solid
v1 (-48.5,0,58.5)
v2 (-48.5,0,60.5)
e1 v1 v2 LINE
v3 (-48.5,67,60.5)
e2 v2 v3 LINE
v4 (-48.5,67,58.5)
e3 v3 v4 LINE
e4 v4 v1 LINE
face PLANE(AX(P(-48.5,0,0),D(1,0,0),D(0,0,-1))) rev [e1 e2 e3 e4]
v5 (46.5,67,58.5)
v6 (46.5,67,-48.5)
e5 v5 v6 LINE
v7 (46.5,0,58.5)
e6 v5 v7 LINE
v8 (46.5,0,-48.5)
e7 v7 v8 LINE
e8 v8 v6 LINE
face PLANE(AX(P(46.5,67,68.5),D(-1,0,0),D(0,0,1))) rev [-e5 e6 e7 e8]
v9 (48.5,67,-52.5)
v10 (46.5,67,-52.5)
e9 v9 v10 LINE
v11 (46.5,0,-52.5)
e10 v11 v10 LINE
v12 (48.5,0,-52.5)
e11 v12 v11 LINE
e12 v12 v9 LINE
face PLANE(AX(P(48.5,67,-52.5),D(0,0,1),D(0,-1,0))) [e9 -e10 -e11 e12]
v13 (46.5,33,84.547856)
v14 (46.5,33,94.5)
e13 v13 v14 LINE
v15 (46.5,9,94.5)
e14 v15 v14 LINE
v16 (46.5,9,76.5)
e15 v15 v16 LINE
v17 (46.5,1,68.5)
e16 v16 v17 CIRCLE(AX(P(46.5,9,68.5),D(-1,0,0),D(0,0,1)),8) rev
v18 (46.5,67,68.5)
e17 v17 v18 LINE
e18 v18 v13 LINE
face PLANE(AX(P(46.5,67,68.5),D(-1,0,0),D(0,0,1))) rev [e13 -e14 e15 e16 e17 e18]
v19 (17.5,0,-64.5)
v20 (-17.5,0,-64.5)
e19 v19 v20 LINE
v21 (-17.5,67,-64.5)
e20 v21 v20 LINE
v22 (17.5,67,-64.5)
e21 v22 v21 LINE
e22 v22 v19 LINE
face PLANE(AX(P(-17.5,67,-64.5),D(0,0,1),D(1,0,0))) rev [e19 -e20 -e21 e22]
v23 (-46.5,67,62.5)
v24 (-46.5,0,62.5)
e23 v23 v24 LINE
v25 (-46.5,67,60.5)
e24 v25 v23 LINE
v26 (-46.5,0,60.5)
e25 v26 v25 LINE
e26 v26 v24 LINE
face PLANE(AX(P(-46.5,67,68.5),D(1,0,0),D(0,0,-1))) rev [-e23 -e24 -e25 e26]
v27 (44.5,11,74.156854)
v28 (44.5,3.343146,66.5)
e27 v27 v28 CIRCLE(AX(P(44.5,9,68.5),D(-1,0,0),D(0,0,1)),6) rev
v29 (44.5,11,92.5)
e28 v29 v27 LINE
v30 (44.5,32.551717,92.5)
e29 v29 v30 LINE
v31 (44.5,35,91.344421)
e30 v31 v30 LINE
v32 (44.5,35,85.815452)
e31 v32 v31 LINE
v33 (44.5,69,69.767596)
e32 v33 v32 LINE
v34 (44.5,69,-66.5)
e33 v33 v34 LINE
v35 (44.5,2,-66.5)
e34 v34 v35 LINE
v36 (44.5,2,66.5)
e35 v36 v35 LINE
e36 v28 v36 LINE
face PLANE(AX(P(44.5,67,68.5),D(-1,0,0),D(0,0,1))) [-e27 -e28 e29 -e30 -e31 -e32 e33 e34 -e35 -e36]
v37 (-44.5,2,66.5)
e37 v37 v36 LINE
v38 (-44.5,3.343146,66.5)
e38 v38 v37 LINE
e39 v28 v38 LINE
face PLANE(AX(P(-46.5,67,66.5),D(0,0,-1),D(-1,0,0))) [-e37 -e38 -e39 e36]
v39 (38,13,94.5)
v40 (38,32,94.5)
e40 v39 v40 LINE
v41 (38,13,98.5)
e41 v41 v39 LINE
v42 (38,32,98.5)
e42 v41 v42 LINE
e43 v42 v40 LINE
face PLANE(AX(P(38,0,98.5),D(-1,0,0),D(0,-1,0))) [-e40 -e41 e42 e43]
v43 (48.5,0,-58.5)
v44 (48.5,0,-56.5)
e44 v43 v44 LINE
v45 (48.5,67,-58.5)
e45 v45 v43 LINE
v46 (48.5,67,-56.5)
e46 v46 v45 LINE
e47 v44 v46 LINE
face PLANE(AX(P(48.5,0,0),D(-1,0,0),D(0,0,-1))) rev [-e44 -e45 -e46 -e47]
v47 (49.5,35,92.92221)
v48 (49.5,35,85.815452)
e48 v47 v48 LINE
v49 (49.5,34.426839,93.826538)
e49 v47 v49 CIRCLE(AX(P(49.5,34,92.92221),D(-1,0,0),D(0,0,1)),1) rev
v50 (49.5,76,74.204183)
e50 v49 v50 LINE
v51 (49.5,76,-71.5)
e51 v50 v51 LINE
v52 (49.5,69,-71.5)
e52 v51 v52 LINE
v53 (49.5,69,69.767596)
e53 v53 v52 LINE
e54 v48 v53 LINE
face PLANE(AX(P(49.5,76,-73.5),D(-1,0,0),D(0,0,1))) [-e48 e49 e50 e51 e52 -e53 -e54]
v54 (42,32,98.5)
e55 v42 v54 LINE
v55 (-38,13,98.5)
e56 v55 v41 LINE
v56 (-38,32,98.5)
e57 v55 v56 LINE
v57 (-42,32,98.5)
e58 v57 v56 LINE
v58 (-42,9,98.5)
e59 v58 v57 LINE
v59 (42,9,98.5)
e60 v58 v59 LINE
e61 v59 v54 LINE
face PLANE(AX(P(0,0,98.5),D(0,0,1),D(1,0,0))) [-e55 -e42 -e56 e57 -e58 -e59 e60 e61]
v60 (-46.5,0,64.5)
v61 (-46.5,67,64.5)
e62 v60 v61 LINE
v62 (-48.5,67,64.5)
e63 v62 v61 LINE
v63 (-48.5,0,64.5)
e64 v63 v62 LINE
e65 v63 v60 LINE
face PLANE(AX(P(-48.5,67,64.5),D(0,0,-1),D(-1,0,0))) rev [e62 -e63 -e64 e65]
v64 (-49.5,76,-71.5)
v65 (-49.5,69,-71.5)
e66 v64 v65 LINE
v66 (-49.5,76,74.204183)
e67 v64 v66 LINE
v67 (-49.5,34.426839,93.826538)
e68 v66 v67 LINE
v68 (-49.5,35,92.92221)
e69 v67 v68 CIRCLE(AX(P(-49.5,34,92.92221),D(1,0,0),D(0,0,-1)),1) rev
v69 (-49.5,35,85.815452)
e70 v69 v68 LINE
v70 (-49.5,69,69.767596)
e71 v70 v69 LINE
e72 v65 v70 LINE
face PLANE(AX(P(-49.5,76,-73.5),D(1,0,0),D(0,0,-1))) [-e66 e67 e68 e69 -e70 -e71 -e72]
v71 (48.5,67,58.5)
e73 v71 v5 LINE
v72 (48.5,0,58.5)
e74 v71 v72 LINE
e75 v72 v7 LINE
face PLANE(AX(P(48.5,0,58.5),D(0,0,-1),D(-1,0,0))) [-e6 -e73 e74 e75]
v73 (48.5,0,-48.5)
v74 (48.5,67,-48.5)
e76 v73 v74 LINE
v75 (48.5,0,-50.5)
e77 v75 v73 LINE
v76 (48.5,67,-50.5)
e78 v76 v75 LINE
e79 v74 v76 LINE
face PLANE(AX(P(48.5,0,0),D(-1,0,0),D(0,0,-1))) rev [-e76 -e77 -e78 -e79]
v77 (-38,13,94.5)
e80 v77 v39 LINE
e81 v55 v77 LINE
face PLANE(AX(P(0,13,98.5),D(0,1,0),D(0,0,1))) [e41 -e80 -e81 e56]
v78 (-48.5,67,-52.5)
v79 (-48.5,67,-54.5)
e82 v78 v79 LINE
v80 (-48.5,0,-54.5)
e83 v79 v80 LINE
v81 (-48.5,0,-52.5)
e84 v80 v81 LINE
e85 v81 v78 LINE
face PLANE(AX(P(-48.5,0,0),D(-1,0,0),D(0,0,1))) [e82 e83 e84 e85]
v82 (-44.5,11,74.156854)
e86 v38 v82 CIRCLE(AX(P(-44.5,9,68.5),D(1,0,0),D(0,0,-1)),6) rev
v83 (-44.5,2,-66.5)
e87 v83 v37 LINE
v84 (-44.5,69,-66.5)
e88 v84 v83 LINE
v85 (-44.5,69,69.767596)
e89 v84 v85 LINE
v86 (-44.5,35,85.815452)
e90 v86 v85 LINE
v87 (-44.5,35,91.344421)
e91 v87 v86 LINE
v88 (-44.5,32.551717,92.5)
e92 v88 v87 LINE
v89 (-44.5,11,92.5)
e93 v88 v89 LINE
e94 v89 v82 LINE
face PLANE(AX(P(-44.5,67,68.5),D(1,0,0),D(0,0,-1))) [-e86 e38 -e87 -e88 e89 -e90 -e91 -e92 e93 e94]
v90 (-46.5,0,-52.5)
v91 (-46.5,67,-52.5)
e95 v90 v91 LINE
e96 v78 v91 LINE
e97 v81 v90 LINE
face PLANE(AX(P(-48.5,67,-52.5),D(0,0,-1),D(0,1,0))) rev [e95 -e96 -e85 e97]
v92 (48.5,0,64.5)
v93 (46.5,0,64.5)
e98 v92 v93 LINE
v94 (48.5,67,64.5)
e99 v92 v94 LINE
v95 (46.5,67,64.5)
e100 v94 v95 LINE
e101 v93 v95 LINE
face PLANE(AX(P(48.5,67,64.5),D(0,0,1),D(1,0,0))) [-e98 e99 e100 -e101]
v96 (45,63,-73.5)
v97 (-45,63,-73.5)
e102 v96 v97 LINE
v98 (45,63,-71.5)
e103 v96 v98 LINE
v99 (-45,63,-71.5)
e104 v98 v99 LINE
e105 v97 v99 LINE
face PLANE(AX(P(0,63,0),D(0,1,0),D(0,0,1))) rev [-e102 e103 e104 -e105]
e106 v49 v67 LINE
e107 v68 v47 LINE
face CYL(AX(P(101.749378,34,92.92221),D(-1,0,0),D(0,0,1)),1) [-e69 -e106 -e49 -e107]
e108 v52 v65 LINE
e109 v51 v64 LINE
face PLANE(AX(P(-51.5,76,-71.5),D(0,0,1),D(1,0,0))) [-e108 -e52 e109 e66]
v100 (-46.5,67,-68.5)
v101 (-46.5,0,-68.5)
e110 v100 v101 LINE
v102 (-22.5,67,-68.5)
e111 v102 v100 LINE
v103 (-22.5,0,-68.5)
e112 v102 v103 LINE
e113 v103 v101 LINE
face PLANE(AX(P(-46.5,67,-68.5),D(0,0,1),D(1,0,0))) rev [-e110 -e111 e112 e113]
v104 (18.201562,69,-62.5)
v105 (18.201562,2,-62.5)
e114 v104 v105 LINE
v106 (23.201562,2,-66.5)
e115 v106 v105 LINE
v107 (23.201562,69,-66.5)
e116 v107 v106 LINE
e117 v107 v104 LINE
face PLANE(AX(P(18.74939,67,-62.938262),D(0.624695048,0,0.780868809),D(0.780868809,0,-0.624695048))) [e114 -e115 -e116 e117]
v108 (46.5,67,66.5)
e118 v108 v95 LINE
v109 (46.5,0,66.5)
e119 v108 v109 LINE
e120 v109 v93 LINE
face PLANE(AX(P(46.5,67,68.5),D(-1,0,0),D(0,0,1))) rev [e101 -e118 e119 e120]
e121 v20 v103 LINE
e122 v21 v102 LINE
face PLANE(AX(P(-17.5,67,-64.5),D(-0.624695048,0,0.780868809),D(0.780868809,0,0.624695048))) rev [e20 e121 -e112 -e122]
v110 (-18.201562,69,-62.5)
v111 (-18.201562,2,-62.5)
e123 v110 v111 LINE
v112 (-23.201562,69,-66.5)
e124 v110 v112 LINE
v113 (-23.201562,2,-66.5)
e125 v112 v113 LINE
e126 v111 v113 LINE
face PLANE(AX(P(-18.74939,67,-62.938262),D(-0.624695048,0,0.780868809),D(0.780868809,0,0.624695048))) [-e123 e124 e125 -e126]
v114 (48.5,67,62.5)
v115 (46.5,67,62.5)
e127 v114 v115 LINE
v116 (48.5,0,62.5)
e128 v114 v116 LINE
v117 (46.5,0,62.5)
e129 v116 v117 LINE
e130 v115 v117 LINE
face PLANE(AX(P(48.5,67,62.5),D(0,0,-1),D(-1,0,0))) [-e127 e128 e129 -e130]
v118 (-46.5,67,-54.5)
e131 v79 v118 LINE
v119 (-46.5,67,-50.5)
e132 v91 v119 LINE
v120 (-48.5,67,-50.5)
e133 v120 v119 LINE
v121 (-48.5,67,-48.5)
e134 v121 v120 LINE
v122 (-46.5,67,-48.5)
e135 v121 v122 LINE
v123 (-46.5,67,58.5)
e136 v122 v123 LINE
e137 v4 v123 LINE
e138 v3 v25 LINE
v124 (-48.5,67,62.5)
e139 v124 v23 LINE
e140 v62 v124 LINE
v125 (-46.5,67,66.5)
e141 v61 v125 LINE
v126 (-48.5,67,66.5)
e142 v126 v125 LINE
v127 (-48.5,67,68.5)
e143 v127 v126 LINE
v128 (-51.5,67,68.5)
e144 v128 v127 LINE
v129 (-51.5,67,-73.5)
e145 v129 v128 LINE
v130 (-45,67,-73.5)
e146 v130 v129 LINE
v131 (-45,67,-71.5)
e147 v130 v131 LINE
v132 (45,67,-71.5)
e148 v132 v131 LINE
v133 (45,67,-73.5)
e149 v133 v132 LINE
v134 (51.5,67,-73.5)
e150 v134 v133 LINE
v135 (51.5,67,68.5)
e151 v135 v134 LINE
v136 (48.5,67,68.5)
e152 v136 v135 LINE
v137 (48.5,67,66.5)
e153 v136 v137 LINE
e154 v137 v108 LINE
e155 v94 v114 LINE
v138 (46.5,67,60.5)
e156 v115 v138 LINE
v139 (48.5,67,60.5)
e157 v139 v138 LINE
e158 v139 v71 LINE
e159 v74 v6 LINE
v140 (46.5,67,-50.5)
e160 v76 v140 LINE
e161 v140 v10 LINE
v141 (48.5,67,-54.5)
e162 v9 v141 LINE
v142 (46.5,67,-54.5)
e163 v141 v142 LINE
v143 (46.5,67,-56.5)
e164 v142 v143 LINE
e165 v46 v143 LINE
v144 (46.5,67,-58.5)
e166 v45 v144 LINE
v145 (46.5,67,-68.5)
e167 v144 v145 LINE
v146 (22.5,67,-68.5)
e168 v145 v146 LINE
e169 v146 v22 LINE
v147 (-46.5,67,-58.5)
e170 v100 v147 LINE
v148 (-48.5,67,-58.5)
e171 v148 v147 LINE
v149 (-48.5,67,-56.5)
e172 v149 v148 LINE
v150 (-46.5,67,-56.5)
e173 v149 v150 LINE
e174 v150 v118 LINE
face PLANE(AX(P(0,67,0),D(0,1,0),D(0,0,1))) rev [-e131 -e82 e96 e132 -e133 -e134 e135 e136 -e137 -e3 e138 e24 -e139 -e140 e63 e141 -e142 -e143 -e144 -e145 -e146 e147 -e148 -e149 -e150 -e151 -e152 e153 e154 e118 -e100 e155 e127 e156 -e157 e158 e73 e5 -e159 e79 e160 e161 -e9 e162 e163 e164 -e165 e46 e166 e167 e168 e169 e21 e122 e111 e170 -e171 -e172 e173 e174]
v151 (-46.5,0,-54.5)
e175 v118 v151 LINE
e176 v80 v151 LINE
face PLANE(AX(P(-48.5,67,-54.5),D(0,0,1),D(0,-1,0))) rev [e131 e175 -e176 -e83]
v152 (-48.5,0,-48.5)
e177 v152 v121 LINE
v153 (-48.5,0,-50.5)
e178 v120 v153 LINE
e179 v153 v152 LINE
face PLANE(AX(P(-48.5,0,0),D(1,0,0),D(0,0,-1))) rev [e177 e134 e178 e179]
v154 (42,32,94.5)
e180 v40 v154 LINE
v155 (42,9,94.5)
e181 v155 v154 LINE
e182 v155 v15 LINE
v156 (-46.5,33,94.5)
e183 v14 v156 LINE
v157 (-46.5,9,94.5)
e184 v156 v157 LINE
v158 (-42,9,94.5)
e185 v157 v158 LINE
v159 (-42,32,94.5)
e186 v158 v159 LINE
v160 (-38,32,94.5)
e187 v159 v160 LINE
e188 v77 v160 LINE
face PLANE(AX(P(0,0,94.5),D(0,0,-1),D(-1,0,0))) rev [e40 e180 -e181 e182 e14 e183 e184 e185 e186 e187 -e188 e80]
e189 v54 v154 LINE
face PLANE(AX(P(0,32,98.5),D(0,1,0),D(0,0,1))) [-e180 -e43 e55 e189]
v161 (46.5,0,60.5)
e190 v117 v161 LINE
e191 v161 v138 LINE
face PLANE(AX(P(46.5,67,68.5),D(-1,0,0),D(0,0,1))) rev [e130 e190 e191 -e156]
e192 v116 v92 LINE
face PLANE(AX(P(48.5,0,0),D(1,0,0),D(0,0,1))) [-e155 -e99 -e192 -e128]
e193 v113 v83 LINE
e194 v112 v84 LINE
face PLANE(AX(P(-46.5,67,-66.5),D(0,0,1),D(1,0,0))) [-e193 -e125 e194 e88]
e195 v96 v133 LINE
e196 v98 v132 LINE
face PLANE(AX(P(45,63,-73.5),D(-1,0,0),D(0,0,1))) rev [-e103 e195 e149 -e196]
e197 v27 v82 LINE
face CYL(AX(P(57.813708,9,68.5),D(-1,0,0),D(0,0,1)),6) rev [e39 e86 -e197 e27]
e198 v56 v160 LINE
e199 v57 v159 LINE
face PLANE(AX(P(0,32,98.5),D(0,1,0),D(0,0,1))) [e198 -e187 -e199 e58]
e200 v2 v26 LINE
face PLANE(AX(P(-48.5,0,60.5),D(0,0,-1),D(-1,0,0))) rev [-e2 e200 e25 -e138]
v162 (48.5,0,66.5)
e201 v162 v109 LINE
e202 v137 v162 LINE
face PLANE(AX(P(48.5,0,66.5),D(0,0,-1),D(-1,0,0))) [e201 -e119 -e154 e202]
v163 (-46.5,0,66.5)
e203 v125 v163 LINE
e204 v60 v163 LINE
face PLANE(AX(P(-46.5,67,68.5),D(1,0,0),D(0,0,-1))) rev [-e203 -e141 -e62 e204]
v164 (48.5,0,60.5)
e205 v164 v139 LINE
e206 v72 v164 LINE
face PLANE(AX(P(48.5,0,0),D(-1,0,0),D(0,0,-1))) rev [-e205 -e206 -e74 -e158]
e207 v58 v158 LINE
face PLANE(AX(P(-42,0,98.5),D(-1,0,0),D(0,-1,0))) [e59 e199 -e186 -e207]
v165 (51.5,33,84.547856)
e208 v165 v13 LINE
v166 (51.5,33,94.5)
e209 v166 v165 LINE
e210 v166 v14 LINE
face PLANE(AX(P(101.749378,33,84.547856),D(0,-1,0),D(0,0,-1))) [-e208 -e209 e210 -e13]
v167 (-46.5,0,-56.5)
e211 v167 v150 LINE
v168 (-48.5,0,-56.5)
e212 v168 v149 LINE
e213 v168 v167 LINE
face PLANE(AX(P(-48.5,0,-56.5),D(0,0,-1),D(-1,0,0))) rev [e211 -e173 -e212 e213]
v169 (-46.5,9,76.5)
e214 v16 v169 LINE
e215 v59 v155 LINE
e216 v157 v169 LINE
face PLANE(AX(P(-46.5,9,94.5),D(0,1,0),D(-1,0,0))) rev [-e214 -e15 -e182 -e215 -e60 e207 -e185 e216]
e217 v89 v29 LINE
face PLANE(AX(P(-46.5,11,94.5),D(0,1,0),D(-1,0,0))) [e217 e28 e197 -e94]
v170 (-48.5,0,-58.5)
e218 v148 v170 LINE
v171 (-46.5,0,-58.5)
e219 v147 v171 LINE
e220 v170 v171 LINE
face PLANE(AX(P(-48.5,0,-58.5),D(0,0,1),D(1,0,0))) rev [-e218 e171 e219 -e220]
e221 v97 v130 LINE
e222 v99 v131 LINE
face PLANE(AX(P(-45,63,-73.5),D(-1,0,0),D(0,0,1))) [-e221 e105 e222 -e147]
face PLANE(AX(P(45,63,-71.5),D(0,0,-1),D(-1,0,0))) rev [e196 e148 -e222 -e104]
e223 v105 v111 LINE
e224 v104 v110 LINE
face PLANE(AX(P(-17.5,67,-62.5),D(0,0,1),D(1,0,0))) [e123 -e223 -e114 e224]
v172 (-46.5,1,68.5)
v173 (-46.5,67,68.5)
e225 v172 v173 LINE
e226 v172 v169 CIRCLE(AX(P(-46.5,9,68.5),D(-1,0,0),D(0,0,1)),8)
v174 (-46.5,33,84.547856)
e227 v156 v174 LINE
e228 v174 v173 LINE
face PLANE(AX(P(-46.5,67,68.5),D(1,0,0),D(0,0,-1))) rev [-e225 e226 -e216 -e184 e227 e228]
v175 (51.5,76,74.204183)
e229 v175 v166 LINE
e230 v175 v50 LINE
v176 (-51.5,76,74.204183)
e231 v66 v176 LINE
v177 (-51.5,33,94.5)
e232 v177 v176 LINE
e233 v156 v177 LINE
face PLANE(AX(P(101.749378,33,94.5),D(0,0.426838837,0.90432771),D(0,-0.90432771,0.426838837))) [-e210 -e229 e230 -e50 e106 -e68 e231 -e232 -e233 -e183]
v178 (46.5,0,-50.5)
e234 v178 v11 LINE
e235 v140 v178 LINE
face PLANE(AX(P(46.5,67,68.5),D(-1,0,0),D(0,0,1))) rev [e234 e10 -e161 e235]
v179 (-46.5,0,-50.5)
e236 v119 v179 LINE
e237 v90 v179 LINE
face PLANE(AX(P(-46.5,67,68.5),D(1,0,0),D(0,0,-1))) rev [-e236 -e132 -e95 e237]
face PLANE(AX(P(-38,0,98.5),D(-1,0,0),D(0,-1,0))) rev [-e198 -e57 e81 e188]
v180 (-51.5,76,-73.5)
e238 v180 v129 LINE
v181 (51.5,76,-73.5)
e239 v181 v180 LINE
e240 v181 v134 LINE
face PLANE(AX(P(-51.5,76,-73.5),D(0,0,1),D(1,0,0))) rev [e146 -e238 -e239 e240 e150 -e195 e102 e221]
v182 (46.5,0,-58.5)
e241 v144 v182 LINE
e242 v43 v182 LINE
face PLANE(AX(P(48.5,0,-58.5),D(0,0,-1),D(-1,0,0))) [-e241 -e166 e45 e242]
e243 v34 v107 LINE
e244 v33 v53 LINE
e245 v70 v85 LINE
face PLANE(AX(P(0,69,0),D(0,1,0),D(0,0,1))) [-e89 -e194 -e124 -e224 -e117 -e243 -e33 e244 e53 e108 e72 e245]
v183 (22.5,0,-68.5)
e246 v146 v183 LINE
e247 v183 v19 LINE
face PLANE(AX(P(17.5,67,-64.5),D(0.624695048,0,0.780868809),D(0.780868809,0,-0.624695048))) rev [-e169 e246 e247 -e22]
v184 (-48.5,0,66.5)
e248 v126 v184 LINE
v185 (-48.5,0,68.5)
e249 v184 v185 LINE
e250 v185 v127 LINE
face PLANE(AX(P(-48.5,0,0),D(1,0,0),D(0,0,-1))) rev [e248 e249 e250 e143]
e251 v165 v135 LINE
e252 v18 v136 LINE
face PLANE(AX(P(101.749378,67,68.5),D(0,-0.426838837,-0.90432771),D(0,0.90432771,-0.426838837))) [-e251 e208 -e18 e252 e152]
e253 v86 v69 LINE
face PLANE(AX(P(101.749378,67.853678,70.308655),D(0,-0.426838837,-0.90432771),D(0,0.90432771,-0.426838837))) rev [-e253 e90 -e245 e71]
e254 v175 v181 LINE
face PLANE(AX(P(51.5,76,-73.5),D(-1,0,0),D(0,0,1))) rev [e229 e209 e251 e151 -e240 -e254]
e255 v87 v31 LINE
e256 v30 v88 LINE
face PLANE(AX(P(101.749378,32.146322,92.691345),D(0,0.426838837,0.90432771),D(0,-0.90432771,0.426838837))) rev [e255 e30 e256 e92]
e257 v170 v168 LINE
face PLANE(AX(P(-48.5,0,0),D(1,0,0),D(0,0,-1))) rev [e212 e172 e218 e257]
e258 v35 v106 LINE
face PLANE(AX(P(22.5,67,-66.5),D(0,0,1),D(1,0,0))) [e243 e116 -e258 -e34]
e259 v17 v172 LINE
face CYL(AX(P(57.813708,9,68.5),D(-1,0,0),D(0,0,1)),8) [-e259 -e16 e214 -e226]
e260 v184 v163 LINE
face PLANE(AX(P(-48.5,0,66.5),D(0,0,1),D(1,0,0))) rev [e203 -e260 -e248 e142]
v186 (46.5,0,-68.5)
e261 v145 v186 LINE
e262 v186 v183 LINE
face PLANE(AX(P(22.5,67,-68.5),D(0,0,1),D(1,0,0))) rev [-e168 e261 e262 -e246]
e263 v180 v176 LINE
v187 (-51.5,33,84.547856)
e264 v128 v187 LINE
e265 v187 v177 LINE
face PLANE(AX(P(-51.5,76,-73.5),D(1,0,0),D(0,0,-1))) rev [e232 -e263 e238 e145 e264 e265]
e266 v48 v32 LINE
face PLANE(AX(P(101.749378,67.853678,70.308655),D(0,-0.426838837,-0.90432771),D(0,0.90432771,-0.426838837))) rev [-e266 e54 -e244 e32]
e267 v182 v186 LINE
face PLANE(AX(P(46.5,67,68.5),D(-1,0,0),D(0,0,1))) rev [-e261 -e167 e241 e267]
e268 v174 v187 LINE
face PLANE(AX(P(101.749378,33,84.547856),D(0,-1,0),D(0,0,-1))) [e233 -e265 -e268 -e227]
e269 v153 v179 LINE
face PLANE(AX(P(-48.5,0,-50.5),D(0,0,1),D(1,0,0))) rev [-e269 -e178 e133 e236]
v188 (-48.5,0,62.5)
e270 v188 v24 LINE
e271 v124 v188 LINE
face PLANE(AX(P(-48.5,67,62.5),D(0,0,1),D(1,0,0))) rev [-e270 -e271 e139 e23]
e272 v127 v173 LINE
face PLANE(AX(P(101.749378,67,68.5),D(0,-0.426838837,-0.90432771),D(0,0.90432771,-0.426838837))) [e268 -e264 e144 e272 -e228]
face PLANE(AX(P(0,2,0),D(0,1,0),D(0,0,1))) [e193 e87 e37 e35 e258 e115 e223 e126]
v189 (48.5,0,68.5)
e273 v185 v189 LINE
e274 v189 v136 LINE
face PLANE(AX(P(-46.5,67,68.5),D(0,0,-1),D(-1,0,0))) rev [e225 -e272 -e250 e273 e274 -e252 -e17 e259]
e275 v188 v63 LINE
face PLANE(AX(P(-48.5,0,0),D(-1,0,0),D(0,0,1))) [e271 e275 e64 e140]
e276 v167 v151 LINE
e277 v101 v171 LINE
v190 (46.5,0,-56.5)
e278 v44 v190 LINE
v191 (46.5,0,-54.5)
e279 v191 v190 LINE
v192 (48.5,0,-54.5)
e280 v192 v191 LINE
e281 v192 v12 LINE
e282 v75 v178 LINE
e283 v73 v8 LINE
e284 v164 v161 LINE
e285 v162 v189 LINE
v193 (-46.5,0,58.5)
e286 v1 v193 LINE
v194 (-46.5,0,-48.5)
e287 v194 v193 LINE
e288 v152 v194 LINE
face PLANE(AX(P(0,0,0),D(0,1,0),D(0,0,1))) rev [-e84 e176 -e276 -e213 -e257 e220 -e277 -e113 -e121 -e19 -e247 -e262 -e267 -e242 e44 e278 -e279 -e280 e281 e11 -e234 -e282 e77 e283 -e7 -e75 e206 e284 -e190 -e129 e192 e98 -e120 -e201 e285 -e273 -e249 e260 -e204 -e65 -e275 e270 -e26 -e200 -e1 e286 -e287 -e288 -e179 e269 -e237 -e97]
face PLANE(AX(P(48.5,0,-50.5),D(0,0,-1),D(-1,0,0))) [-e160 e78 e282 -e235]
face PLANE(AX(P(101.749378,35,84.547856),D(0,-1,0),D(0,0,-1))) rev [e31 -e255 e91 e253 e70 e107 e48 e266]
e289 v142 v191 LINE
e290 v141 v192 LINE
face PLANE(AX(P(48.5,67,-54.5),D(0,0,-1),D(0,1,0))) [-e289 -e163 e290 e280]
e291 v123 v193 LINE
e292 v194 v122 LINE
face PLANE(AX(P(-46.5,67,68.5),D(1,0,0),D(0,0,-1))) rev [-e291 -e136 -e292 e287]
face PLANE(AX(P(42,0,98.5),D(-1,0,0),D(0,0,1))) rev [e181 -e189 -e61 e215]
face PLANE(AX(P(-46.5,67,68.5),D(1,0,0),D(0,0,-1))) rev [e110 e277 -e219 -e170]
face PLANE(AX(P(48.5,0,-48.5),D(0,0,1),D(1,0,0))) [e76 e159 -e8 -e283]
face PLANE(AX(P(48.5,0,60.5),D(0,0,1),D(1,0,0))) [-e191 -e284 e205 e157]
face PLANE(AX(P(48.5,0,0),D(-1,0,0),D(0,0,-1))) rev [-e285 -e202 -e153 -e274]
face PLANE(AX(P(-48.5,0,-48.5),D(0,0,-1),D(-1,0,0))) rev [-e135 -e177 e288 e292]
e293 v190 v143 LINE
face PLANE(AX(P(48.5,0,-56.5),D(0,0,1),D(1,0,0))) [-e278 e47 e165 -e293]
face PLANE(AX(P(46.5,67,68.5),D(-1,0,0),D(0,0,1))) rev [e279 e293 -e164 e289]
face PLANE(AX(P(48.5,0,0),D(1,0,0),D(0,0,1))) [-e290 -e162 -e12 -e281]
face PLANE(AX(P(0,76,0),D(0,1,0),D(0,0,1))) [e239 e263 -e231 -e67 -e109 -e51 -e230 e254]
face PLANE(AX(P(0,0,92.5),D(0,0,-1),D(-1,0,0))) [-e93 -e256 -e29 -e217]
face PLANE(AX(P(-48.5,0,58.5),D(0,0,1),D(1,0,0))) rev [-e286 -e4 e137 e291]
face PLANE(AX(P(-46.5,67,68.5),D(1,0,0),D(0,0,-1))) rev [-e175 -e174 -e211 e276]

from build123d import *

# Parameters (mm, degrees)
BOSS_EXTRUDE1_DEPTH = 67
SKETCH2_W           = 103
SKETCH2_H           = 142
BOSS_EXTRUDE2_DEPTH = 9
SKETCH3_W           = 90
SKETCH3_H           = 2
BOSS_EXTRUDE3_DEPTH = 4
SKETCH4_W           = 93
SKETCH4_H           = 24
BOSS_EXTRUDE4_DEPTH = 26
BOSS_EXTRUDE5_DEPTH = 93
BOSS_EXTRUDE6_REACH = 161.108
BOSS_EXTRUDE7_DEPTH = 93
SHELL5_START        = -44.5
SHELL5_DEPTH        = 89
SHELL5_START_2      = -49.5
SHELL5_2_DEPTH      = 99
SHELL5_3_OUTLINE_W  = 67
SHELL5_3_OUTLINE_H  = 4
SHELL5_3_DEPTH      = 21.298437881
SHELL5_START_3      = 23.201562119
SHELL5_4_OUTLINE_W  = 67
SHELL5_4_OUTLINE_H  = 4
SHELL5_4_DEPTH      = 21.298437881
SHELL5_START_4      = 2
SHELL5_5_DEPTH      = 67
CUT_EXTRUDE1_REACH  = 193.448
SKETCH11_W          = 99
SKETCH11_H          = 41
FILLET2_R           = 1
SKETCH12_W          = 2
SKETCH12_H          = 67
BOSS_EXTRUDE8_DEPTH = 2
SKETCH13_W          = 76
SKETCH13_H          = 4
BOSS_EXTRUDE9_DEPTH = 4


with BuildPart() as part:
    # Sketch1 → Boss-Extrude1 (new body)
    with BuildSketch(Plane(origin=(0, 0, 0), x_dir=(1, 0, 0), z_dir=(0, 1, 0))):
        Polygon((-17.5, 64.5), (17.5, 64.5), (22.5, 68.5), (46.5, 68.5), (46.5, -68.5), (-46.5, -68.5), (-46.5, 68.5), (-22.5, 68.5), align=None)
    extrude(amount=BOSS_EXTRUDE1_DEPTH)

    # Sketch2 → Boss-Extrude2 (add)
    with BuildSketch(Plane(origin=(0, 67, 0), x_dir=(1, 0, 0), z_dir=(0, 1, 0))):
        with Locations((0, 2.5)):
            Rectangle(SKETCH2_W, SKETCH2_H)
    extrude(amount=BOSS_EXTRUDE2_DEPTH)

    # Sketch3 → Boss-Extrude3 (add)
    with BuildSketch(Plane.XZ.offset(-67)):
        with Locations((0, -72.5)):
            Rectangle(SKETCH3_W, SKETCH3_H)
    extrude(amount=BOSS_EXTRUDE3_DEPTH)

    # Sketch4 → Boss-Extrude4 (add)
    with BuildSketch(Plane.XY.offset(68.5)):
        with Locations((0, 21)):
            Rectangle(SKETCH4_W, SKETCH4_H)
    extrude(amount=BOSS_EXTRUDE4_DEPTH)

    # Sketch5 → Boss-Extrude5 (add)
    with BuildSketch(Plane.ZY.offset(46.5)):
        Polygon((68.5, 67), (94.5, 33), (68.5, 33), align=None)
    extrude(amount=-BOSS_EXTRUDE5_DEPTH)

    # Boss-Extrude6: up to this face of the body (flat: up to its plane)
    boss_extrude6_end = Plane(part.part.faces().sort_by_distance((51.5, 71.5, -2.5))[0])
    # Sketch7 → Boss-Extrude6 (add, up to the picked face)
    with BuildSketch(Plane.ZY.offset(51.5), mode=Mode.PRIVATE) as boss_extrude6_sk1:
        Polygon((68.5, 67), (84.547855551, 33), (94.5, 33), (74.204182686, 76), (68.5, 76), align=None)
    boss_extrude6_tool1 = split(extrude(boss_extrude6_sk1.sketch, amount=-BOSS_EXTRUDE6_REACH, mode=Mode.PRIVATE), bisect_by=boss_extrude6_end, keep=Keep.BOTH, mode=Mode.PRIVATE)
    add(boss_extrude6_tool1.solids().sort_by(Axis((-51.5, 53.63498, 79.950766), (1, 0, 0)))[0])

    # Sketch8 → Boss-Extrude7 (add)
    with BuildSketch(Plane.ZY.offset(46.5)):
        with BuildLine():
            Line((76.5, 9), (68.5, 9))
            Line((68.5, 9), (68.5, 1))
            ThreePointArc((68.5, 1), (74.156854249, 3.343145751), (76.5, 9))
        make_face()
    extrude(amount=-BOSS_EXTRUDE7_DEPTH)

    # Shell5: read off the stored shape, not the designer's step
    # Shell5 outline → Shell5 (cut)
    with BuildSketch(Plane.YZ.offset(SHELL5_START)):
        with BuildLine():
            Line((69, -71.5), (76, -71.5))
            Line((76, -71.5), (76, 71.992595031))
            Line((76, 71.992595031), (32.551717034, 92.5))
            Line((32.551717034, 92.5), (11, 92.5))
            Line((11, 92.5), (11, 74.156854249))
            ThreePointArc((11, 74.156854249), (4.757359313, 72.742640687), (3.343145751, 66.5))
            Line((3.343145751, 66.5), (2, 66.5))
            Line((2, 66.5), (2, -62.5))
            Line((2, -62.5), (69, -62.5))
            Line((69, -62.5), (69, -71.5))
        make_face()
    extrude(amount=SHELL5_DEPTH, mode=Mode.SUBTRACT)

    # Shell5 2 outline → Shell5 2 (cut)
    with BuildSketch(Plane.YZ.offset(SHELL5_START_2)):
        Polygon((69, -71.5), (76, -71.5), (76, 71.992595031), (35, 91.344420842), (35, 85.815451703), (69, 69.767596152), align=None)
    extrude(amount=SHELL5_2_DEPTH, mode=Mode.SUBTRACT)

    # Shell5 3 outline → Shell5 3 (cut)
    with BuildSketch(Plane.YZ.offset(SHELL5_START)):
        with Locations((35.5, -64.5)):
            Rectangle(SHELL5_3_OUTLINE_W, SHELL5_3_OUTLINE_H)
    extrude(amount=SHELL5_3_DEPTH, mode=Mode.SUBTRACT)

    # Shell5 4 outline → Shell5 4 (cut)
    with BuildSketch(Plane.YZ.offset(SHELL5_START_3)):
        with Locations((35.5, -64.5)):
            Rectangle(SHELL5_4_OUTLINE_W, SHELL5_4_OUTLINE_H)
    extrude(amount=SHELL5_4_DEPTH, mode=Mode.SUBTRACT)

    # Shell5 5 outline → Shell5 5 (cut)
    with BuildSketch(Plane(origin=(0, 0, 0), x_dir=(1, 0, 0), z_dir=(0, 1, 0)).offset(SHELL5_START_4)):
        Polygon((-23.201562119, 62.5), (-18.201562119, 62.5), (-23.201562119, 66.5), align=None)
        Polygon((23.201562119, 66.5), (18.201562119, 62.5), (23.201562119, 62.5), align=None)
    extrude(amount=SHELL5_5_DEPTH, mode=Mode.SUBTRACT)

    # Cut-Extrude1: up to this face of the body (flat: up to its plane)
    cut_extrude1_end = Plane(part.part.faces().sort_by_distance((-47, 52, 77.791523927))[0])
    # Sketch11 → Cut-Extrude1 (cut, up to the picked face)
    with BuildSketch(Plane.XY.offset(94.5), mode=Mode.PRIVATE) as cut_extrude1_sk1:
        with Locations((0, 55.5)):
            Rectangle(SKETCH11_W, SKETCH11_H)
    cut_extrude1_tool1 = split(extrude(cut_extrude1_sk1.sketch, amount=-CUT_EXTRUDE1_REACH, mode=Mode.PRIVATE), bisect_by=cut_extrude1_end, keep=Keep.BOTH, mode=Mode.PRIVATE)
    add(cut_extrude1_tool1.solids().sort_by(Axis((0, 55.5, 94.5), (0, 0, -1)))[0], mode=Mode.SUBTRACT)

    # Fillet2
    fillet2_edges = [part.edges().sort_by_distance(p)[0] for p in [
        (0, 35, 93.556008497),
    ]]
    fillet(fillet2_edges, radius=FILLET2_R)

    # Sketch12 → Boss-Extrude8 (add)
    with BuildSketch(Plane.ZY.offset(46.5)):
        with Locations((-57.5, 33.5)):
            Rectangle(SKETCH12_W, SKETCH12_H)
        with Locations((-53.5, 33.5)):
            Rectangle(SKETCH12_W, SKETCH12_H)
        with Locations((-49.5, 33.5)):
            Rectangle(SKETCH12_W, SKETCH12_H)
        with Locations((59.5, 33.5)):
            Rectangle(SKETCH12_W, SKETCH12_H)
        with Locations((63.5, 33.5)):
            Rectangle(SKETCH12_W, SKETCH12_H)
        with Locations((67.5, 33.5)):
            Rectangle(SKETCH12_W, SKETCH12_H)
    boss_extrude8 = extrude(amount=BOSS_EXTRUDE8_DEPTH)

    # Mirror1: Boss-Extrude8 across plane
    add(boss_extrude8.mirror(Plane(origin=(0, 0, 0), x_dir=(0, 0, 1), z_dir=(1, 0, 0))))

    # Sketch13 → Boss-Extrude9 (add)
    with BuildSketch(Plane.XY.offset(94.5)):
        Polygon((-42, 32), (-42, 9), (-38, 9), (-38, 13), (-38, 32), align=None)
        with Locations((0, 11)):
            Rectangle(SKETCH13_W, SKETCH13_H)
        Polygon((38, 13), (38, 9), (42, 9), (42, 32), (38, 32), align=None)
    extrude(amount=BOSS_EXTRUDE9_DEPTH)


solid = part.part
